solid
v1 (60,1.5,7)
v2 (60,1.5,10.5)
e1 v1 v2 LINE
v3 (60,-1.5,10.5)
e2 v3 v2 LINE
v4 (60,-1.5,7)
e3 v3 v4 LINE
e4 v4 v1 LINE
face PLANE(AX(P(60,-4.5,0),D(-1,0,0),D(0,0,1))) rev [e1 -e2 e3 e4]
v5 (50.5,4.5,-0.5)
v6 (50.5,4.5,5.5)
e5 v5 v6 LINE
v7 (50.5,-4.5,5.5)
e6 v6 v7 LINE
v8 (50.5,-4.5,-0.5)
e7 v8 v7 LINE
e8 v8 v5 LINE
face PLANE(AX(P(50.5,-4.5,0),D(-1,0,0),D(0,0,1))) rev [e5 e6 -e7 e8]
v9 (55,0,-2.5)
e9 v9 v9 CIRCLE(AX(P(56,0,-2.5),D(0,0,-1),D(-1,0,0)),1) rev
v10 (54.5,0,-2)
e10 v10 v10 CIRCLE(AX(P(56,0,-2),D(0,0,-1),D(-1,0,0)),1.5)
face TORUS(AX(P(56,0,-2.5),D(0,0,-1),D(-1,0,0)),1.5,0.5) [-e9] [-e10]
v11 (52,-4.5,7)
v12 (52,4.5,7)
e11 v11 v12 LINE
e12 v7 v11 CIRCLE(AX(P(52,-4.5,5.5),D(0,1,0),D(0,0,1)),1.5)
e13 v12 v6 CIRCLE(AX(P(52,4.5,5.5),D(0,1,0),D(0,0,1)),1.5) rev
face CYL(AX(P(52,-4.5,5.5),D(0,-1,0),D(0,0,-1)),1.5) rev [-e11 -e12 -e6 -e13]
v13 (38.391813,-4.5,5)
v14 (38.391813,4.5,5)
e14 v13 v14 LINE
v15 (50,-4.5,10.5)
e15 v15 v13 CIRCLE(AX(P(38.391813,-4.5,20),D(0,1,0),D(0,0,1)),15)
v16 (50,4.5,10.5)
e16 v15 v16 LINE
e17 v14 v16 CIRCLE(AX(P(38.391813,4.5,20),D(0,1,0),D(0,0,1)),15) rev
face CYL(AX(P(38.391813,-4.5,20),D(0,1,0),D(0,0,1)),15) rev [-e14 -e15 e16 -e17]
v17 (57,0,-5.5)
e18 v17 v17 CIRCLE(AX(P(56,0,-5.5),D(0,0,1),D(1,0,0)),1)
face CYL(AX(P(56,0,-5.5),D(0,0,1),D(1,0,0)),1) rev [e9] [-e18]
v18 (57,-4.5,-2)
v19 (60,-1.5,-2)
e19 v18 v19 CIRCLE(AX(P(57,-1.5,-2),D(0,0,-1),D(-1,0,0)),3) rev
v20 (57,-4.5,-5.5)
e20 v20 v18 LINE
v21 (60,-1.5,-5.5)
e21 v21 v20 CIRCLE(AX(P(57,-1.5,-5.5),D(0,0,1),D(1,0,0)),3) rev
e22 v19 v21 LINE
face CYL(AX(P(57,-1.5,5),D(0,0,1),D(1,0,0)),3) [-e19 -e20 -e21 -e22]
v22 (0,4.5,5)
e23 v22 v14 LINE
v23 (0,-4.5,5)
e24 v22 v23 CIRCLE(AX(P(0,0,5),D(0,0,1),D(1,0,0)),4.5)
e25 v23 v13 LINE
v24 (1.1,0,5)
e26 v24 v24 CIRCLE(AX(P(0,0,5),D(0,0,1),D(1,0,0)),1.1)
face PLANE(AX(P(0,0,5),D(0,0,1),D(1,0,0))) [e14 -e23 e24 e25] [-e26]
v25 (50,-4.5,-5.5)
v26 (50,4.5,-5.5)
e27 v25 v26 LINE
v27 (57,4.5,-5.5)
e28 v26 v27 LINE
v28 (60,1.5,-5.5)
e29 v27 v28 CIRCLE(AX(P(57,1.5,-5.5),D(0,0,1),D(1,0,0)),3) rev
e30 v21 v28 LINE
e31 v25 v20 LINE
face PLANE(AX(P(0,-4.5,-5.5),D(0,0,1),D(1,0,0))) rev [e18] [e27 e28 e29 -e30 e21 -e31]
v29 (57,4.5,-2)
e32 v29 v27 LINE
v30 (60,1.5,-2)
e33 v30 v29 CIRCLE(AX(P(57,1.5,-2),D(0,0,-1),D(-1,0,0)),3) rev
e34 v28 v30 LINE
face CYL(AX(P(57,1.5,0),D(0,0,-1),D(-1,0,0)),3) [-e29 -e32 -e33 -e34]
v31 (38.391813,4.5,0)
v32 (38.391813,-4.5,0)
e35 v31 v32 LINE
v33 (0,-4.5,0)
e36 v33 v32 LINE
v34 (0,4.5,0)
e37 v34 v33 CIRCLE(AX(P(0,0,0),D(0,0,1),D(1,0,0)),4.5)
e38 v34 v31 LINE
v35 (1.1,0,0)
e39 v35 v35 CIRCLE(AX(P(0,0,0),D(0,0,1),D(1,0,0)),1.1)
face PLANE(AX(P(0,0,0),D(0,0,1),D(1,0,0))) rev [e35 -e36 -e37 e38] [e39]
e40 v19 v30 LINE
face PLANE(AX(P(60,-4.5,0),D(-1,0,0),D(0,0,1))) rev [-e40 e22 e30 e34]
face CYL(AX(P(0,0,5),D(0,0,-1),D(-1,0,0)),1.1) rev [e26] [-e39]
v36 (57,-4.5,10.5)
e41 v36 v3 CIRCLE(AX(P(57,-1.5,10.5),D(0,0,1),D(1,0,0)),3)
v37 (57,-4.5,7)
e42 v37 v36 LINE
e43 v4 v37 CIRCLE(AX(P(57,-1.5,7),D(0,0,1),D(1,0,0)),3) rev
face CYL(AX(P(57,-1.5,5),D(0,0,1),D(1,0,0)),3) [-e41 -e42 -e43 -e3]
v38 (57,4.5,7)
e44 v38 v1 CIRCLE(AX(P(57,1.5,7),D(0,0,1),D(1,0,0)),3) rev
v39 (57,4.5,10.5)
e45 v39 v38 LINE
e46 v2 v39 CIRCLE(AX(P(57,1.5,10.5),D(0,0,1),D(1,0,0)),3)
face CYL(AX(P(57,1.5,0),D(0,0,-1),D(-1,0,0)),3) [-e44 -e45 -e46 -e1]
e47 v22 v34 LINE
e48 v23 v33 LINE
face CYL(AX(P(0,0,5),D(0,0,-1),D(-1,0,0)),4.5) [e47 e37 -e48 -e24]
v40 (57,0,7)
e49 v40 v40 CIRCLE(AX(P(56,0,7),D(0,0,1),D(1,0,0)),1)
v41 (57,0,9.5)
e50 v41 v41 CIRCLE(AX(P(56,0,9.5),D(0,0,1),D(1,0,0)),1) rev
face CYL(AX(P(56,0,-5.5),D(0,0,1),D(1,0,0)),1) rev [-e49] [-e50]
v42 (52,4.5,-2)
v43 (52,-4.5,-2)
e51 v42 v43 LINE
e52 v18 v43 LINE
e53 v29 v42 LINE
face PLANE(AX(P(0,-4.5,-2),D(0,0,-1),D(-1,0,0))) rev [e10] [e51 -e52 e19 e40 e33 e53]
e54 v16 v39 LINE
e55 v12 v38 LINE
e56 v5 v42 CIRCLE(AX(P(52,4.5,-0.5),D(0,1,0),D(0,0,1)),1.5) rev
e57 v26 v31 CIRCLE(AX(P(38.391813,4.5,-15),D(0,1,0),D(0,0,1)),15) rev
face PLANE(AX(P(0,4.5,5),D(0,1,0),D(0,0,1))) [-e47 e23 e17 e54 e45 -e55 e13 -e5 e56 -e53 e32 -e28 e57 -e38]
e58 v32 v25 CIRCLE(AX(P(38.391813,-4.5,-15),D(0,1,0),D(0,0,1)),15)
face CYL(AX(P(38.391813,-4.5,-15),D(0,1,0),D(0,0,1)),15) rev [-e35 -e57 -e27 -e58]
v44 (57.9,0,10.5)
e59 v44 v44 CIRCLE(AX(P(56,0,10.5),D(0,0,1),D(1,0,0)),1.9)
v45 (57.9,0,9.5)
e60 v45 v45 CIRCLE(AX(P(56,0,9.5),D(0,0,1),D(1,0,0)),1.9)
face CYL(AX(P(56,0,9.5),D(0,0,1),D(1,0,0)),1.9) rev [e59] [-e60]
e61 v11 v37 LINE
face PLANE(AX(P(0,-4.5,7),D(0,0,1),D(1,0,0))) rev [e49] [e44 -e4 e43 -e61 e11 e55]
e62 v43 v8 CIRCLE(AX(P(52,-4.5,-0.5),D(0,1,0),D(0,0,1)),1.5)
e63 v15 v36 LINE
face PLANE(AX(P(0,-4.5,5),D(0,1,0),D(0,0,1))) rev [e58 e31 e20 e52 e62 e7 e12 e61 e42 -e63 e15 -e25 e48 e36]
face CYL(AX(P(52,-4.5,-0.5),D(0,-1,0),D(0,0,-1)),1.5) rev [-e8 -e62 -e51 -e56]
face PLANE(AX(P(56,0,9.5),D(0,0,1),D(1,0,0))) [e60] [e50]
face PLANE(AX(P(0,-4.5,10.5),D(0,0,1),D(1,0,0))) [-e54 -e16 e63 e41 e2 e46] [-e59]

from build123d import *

# Parameters (mm, degrees)
SKETCH1_R           = 1.1
BOSS_EXTRUDE1_DEPTH = 5
BOSS_EXTRUDE2_DEPTH = 9
FILLET1_R           = 15
SKETCH3_R           = 1
CUT_EXTRUDE1_DEPTH  = 16
FILLET2_R           = 3
SKETCH4_R           = 1.9
CUT_EXTRUDE2_DEPTH  = 1
FILLET3_R           = 1.5
FILLET4_R           = 0.5


with BuildPart() as part:
    # Sketch1 → Boss-Extrude1 (new body)
    with BuildSketch(Plane.XY):
        with BuildLine():
            ThreePointArc((0, 4.5), (-4.5, 0), (0, -4.5))
            Line((0, -4.5), (50, -4.5))
            Line((50, -4.5), (50, 4.5))
            Line((50, 4.5), (0, 4.5))
        make_face()
        Circle(SKETCH1_R, mode=Mode.SUBTRACT)
    extrude(amount=BOSS_EXTRUDE1_DEPTH)

    # Sketch2 → Boss-Extrude2 (add)
    with BuildSketch(Plane(origin=(0, 4.5, 0), x_dir=(1, 0, 0), z_dir=(0, 1, 0))):
        Polygon((50.5, 2), (60, 2), (60, 5.5), (50, 5.5), (50, 0), (50, -5), (50, -10.5), (60, -10.5), (60, -7), (50.5, -7), align=None)
    extrude(amount=-BOSS_EXTRUDE2_DEPTH)

    # Fillet1
    # the kernel refuses this fillet: 15 mm, written as the material it adds along each edge
    with BuildSketch(Plane(origin=(50, -4.5, 0), x_dir=(0, 0, -1), z_dir=(0, 1, 0))) as fillet1_piece_1:
        with BuildLine():
            CenterArc((15, 11.608186766), FILLET1_R, 180, 50.703519761)
            Line((0, 11.608186766), (-0.3, 11.608186766))
            Line((-0.3, 11.608186766), (-0.3, 0))
            Line((-0.3, 0), (0, -0.3))
            ThreePointArc((0, -0.3), (2.75, -0.3), (5.31, -0.232163735))
            Line((5.31, -0.232163735), (5.5, 0))
        make_face()
    extrude(amount=9)
    with BuildSketch(Plane(origin=(50, -4.5, 5), x_dir=(0, 0, 1), z_dir=(0, 1, 0))) as fillet1_piece_2:
        with BuildLine():
            CenterArc((15, -11.608186766), FILLET1_R, 129.296480239, 50.703519761)
            Line((0, -11.608186766), (-0.3, -11.608186766))
            Line((-0.3, -11.608186766), (-0.3, 0))
            Line((-0.3, 0), (0, 0.3))
            ThreePointArc((0, 0.3), (2.75, 0.3), (5.31, 0.232163735))
            Line((5.31, 0.232163735), (5.5, 0))
        make_face()
    extrude(amount=9)

    # Sketch3 → Cut-Extrude1 (cut)
    with BuildSketch(Plane.XY.offset(10.5)):
        with Locations((56, 0)):
            Circle(SKETCH3_R)
    extrude(amount=-CUT_EXTRUDE1_DEPTH, mode=Mode.SUBTRACT)

    # Fillet2
    fillet2_edges = [part.edges().sort_by_distance(p)[0] for p in [
        (60, 4.5, 8.75),
        (60, 4.5, -3.75),
        (60, -4.5, 8.75),
        (60, -4.5, -3.75),
    ]]
    fillet(fillet2_edges, radius=FILLET2_R)

    # Sketch4 → Cut-Extrude2 (cut)
    with BuildSketch(Plane.XY.offset(10.5)):
        with Locations((56, 0)):
            Circle(SKETCH4_R)
    extrude(amount=-CUT_EXTRUDE2_DEPTH, mode=Mode.SUBTRACT)

    # Fillet3
    fillet3_edges = [part.edges().sort_by_distance(p)[0] for p in [
        (50.5, 0, 7),
        (50.5, 0, -2),
    ]]
    fillet(fillet3_edges, radius=FILLET3_R)

    # Fillet4
    fillet4_edges = [part.edges().sort_by_distance(p)[0] for p in [
        (55, 0, -2),
    ]]
    fillet(fillet4_edges, radius=FILLET4_R)


solid = part.part
